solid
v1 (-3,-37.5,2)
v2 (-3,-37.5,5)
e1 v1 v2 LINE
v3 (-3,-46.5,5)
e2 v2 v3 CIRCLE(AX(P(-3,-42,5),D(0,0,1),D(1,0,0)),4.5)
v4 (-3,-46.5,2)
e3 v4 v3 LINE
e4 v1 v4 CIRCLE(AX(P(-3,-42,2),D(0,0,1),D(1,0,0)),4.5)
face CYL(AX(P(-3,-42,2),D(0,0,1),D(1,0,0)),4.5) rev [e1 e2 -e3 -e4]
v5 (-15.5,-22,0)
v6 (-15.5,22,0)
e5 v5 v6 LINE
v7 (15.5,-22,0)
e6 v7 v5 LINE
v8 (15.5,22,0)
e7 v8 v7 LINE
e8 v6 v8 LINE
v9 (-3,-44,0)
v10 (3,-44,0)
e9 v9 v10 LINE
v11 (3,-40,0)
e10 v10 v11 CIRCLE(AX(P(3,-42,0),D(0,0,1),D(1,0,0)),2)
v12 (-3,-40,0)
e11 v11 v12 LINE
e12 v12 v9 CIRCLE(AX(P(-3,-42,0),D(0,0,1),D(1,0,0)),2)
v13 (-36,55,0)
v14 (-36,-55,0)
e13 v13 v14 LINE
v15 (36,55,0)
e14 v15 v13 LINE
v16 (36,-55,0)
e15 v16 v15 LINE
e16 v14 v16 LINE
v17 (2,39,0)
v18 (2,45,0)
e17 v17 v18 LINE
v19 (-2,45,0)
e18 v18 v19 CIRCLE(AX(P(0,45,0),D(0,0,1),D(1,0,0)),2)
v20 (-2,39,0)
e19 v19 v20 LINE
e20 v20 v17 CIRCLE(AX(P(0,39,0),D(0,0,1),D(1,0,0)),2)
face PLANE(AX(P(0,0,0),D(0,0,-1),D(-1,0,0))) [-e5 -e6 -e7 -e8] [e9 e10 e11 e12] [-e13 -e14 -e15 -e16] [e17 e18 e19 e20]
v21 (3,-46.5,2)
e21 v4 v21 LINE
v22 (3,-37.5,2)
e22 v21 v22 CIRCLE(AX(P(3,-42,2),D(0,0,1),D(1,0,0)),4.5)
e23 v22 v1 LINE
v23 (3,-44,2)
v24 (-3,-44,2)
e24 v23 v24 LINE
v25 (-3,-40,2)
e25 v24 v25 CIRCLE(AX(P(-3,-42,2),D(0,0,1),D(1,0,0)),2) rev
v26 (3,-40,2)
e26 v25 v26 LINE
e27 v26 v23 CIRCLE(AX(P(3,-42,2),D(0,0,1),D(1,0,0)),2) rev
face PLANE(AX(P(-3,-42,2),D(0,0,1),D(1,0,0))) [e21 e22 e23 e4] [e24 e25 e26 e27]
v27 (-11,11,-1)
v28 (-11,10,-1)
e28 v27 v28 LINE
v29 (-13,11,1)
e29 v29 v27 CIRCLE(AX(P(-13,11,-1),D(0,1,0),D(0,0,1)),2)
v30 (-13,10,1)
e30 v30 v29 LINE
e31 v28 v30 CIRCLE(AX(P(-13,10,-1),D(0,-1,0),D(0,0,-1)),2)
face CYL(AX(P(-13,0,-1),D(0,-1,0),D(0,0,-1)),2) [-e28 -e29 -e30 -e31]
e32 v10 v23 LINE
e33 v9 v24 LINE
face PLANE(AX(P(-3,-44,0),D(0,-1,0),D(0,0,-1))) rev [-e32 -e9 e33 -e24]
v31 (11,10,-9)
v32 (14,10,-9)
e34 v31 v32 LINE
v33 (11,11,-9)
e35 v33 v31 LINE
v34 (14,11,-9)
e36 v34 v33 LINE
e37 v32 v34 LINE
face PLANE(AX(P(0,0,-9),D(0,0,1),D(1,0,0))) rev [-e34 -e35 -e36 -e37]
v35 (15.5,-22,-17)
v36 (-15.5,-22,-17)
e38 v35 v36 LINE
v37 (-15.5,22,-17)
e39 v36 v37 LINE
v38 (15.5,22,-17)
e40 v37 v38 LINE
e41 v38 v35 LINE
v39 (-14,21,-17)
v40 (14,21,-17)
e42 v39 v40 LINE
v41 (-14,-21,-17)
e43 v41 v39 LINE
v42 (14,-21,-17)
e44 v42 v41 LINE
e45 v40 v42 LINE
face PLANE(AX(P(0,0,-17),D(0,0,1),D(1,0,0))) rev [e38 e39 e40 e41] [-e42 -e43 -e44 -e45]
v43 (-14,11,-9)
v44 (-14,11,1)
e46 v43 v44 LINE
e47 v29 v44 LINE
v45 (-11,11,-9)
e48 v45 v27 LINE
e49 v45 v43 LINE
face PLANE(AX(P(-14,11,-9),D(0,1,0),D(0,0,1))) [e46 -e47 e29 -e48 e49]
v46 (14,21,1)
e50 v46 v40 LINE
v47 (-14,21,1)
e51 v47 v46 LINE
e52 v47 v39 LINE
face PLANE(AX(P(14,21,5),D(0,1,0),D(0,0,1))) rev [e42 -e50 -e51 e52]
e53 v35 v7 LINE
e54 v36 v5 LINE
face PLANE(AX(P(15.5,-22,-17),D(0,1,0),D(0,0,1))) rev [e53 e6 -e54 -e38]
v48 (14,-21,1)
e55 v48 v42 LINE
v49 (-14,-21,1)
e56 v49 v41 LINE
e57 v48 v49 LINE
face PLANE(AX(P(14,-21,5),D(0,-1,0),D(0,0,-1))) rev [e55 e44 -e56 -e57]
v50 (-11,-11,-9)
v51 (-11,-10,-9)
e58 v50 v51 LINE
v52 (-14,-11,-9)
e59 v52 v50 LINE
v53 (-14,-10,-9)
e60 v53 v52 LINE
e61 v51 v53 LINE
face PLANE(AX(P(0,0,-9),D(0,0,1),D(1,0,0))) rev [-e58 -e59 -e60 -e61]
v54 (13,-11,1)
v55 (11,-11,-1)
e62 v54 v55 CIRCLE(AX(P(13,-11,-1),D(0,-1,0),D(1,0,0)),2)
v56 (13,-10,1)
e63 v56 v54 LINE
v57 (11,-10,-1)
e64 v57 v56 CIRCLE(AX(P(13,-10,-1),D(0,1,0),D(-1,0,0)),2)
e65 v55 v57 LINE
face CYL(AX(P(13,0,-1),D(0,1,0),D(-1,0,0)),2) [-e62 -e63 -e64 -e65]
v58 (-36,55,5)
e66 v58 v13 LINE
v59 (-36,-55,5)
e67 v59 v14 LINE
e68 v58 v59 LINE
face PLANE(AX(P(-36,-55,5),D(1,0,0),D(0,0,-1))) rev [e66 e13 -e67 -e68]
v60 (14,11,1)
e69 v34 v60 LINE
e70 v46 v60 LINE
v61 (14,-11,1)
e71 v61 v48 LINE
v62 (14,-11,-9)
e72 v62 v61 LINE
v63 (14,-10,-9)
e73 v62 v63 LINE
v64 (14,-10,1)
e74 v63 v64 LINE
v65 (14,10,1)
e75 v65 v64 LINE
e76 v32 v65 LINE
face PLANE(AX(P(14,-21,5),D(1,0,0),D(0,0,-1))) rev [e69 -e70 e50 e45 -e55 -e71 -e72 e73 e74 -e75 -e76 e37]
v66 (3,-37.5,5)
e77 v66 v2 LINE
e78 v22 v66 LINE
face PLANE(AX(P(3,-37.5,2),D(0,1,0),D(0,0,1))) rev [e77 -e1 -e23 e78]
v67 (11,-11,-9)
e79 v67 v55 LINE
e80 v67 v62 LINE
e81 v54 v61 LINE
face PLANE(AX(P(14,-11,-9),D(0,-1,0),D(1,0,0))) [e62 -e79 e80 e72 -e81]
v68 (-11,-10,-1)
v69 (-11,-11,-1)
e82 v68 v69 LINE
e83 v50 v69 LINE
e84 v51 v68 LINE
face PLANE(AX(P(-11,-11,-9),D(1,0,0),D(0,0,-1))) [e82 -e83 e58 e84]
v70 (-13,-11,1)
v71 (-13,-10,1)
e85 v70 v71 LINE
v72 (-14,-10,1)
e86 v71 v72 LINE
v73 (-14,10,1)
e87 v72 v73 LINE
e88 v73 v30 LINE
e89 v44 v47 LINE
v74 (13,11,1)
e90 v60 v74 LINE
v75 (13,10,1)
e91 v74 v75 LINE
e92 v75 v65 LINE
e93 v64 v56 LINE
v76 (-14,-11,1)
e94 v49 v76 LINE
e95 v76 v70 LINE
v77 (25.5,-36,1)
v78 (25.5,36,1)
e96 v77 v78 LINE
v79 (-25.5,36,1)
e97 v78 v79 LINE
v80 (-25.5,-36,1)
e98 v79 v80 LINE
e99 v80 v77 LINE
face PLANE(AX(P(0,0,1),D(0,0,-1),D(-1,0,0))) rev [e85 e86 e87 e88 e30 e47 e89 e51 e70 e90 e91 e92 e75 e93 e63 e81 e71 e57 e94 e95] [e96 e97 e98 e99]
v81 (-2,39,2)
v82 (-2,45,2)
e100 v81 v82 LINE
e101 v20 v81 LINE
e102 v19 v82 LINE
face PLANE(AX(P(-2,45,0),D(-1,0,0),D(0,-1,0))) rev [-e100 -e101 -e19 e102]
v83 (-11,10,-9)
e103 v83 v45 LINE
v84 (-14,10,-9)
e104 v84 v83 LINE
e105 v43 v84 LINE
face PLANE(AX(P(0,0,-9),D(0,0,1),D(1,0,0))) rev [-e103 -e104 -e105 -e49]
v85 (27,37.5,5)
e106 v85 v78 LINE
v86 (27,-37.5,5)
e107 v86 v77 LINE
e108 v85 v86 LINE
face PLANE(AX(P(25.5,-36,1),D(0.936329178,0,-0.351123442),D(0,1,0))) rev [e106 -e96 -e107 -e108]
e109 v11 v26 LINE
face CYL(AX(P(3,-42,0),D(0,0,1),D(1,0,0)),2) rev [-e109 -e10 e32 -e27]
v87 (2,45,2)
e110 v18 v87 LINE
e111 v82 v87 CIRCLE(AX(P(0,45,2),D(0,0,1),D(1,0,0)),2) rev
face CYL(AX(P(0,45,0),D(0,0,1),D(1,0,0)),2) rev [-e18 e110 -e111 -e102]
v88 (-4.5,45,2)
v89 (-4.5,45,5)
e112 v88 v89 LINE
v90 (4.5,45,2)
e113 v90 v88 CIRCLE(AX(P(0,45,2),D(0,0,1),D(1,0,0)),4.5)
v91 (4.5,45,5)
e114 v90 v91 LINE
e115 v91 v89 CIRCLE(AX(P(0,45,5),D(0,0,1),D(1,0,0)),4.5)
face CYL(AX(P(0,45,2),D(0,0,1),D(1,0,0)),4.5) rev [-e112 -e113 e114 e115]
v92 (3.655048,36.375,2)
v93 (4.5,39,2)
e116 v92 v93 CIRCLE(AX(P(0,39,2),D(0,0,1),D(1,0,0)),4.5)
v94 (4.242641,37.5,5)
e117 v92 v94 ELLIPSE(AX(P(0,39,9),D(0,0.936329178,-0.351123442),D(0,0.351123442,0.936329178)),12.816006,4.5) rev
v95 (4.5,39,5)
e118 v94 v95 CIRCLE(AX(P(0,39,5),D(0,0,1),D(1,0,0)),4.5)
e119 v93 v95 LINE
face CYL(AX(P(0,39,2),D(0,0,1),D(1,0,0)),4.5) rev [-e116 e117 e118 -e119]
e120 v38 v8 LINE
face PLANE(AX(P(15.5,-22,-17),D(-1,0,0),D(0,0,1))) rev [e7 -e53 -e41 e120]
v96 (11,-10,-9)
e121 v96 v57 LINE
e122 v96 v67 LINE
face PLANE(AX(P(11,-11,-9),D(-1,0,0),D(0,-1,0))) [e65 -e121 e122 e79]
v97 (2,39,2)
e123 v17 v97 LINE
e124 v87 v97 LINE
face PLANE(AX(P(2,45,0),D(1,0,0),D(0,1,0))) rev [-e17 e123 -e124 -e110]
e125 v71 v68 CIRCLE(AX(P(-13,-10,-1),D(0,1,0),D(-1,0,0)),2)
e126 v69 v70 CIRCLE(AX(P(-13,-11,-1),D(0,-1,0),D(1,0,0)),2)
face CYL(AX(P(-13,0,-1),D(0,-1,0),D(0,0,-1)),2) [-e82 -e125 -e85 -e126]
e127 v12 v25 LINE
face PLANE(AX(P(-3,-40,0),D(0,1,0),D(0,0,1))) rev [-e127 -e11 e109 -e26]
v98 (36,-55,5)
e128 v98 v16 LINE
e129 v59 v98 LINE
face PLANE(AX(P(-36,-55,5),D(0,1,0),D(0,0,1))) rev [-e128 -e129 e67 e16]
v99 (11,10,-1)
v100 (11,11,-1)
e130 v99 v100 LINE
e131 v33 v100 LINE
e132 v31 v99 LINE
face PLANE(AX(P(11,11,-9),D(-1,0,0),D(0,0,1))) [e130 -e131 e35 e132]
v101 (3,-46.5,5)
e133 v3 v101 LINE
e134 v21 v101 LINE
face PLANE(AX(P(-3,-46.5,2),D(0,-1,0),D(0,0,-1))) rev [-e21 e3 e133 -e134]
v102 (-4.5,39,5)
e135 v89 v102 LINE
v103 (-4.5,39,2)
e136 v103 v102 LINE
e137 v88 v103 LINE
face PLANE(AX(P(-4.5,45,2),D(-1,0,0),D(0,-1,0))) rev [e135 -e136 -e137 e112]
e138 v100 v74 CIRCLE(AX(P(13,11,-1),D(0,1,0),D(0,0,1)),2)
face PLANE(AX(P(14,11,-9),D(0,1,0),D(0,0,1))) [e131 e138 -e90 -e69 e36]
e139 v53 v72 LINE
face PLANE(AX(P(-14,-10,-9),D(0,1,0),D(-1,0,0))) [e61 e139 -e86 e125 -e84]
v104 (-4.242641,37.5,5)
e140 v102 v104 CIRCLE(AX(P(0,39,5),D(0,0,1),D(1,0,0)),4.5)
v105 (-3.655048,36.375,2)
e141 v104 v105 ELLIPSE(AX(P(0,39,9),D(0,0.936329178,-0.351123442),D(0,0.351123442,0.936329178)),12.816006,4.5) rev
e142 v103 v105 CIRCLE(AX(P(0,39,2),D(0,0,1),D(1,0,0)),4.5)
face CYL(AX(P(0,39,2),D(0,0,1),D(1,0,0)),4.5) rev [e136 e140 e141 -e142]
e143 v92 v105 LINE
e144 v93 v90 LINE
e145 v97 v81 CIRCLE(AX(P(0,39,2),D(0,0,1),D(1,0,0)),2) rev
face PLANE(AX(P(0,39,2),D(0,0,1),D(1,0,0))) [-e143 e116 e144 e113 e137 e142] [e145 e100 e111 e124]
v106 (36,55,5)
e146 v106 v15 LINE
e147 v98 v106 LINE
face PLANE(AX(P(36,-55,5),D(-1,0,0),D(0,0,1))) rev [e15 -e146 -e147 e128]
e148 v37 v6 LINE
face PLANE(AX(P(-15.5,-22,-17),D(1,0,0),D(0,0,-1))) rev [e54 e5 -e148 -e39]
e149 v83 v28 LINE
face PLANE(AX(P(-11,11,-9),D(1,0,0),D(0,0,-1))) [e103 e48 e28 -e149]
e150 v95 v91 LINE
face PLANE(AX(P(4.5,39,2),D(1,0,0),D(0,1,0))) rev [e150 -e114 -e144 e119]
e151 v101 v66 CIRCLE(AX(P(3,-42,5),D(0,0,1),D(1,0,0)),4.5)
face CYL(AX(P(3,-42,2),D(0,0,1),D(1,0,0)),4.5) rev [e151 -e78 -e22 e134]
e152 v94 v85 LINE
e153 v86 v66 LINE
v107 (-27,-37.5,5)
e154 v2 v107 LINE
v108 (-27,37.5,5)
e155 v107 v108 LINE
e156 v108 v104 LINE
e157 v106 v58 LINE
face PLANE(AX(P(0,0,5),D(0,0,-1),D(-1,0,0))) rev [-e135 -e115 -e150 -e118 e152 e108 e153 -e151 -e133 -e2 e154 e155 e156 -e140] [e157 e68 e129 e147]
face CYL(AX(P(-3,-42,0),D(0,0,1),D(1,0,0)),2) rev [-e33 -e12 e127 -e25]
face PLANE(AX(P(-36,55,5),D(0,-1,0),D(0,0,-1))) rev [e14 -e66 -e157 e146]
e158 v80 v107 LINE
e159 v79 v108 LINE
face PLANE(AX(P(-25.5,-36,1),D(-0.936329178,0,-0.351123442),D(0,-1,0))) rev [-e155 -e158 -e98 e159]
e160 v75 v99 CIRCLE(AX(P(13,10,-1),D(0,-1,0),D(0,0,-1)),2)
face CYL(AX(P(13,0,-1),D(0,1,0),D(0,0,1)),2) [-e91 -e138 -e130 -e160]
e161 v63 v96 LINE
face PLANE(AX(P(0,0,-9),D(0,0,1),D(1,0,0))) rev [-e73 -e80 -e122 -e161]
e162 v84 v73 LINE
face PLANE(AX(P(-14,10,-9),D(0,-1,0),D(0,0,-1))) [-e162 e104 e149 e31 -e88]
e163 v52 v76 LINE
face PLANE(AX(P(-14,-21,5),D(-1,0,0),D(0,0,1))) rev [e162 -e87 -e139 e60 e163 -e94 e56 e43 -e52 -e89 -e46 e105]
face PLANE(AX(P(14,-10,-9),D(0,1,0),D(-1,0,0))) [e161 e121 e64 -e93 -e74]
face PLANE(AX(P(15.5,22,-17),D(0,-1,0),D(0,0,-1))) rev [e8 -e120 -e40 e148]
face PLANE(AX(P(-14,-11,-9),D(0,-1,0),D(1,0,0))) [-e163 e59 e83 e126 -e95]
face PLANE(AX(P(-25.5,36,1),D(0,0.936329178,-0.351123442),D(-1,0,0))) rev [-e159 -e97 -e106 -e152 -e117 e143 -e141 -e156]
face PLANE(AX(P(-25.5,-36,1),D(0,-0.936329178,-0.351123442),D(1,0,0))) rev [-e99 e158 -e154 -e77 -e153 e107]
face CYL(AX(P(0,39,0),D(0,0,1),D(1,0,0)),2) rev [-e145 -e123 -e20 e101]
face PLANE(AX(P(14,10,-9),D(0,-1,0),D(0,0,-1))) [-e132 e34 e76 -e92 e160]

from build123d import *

# Parameters (mm, degrees)
ESBO_O1_W                = 72
ESBO_O1_H                = 110
RESSALTO_EXTRUS_O1_DEPTH = 5
ESBO_O2_W                = 51
ESBO_O2_H                = 72
CORTE_EXTRUS_O1_DEPTH    = 4
CHANFRO1_SIZE            = 1.5
CHANFRO1_SIZE_2          = 4
CORTE_EXTRUS_O2_DEPTH    = 66.924198895
CORTE_EXTRUS_O3_DEPTH    = 66.924198895
CORTE_EXTRUS_O4_DEPTH    = 3
CORTE_EXTRUS_O5_DEPTH    = 3
ESBO_O7_W                = 31
ESBO_O7_H                = 44
RESSALTO_EXTRUS_O2_DEPTH = 17
ESBO_O8_W                = 28
ESBO_O8_H                = 42
CORTE_EXTRUS_O6_DEPTH    = 70.318107302
ESBO_O9_W                = 3
ESBO_O9_H                = 1
RESSALTO_EXTRUS_O3_DEPTH = 10
FILETE1_R                = 2


with BuildPart() as part:
    # Esboço1 → Ressalto-extrusão1 (new body)
    with BuildSketch(Plane.XY):
        Rectangle(ESBO_O1_W, ESBO_O1_H)
    extrude(amount=RESSALTO_EXTRUS_O1_DEPTH)

    # Esboço2 → Corte-extrusão1 (cut)
    with BuildSketch(Plane.XY.offset(5)):
        Rectangle(ESBO_O2_W, ESBO_O2_H)
    extrude(amount=-CORTE_EXTRUS_O1_DEPTH, mode=Mode.SUBTRACT)

    # Chanfro1
    # the kernel refuses this chamfer: 4, 1.5 mm, written as the material it takes off along each edge
    with BuildSketch(Plane(origin=(-25.5, -36, 5), x_dir=(0, -0.9953980532473654, 0.09582648689874358), z_dir=(1, 0, 0))) as chanfro1_piece_1_section:
        Polygon((CHANFRO1_SIZE * 0.995398053247, CHANFRO1_SIZE * 0.0958264868987), (-CHANFRO1_SIZE_2 * 0.0958264868987, CHANFRO1_SIZE_2 * 0.995398053247), (0, 0), align=None)
    chanfro1_piece_1 = extrude(amount=51, mode=Mode.PRIVATE)
    chanfro1_piece_1 = split(chanfro1_piece_1, bisect_by=Plane(origin=(0, -36.465264147, 1), z_dir=(0, 0, 1)), keep=Keep.TOP, mode=Mode.PRIVATE)
    add(chanfro1_piece_1, mode=Mode.SUBTRACT)
    with BuildSketch(Plane(origin=(-25.5, 36, 5), x_dir=(-0.9953980532473654, 0, 0.09582648689874379), z_dir=(0, -1, 0))) as chanfro1_piece_2_section:
        Polygon((CHANFRO1_SIZE * 0.995398053247, CHANFRO1_SIZE * 0.0958264868987), (-CHANFRO1_SIZE_2 * 0.0958264868987, CHANFRO1_SIZE_2 * 0.995398053247), (0, 0), align=None)
    chanfro1_piece_2 = extrude(amount=72, mode=Mode.PRIVATE)
    chanfro1_piece_2 = split(chanfro1_piece_2, bisect_by=Plane(origin=(-25.965264147, 0, 1), z_dir=(0, 0, 1)), keep=Keep.TOP, mode=Mode.PRIVATE)
    add(chanfro1_piece_2, mode=Mode.SUBTRACT)
    with BuildSketch(Plane(origin=(25.5, -36, 5), x_dir=(0.9953980532473654, 0, 0.09582648689874379), z_dir=(0, 1, 0))) as chanfro1_piece_3_section:
        Polygon((CHANFRO1_SIZE * 0.995398053247, CHANFRO1_SIZE * 0.0958264868987), (-CHANFRO1_SIZE_2 * 0.0958264868987, CHANFRO1_SIZE_2 * 0.995398053247), (0, 0), align=None)
    chanfro1_piece_3 = extrude(amount=72, mode=Mode.PRIVATE)
    chanfro1_piece_3 = split(chanfro1_piece_3, bisect_by=Plane(origin=(25.965264147, 0, 1), z_dir=(0, 0, 1)), keep=Keep.TOP, mode=Mode.PRIVATE)
    add(chanfro1_piece_3, mode=Mode.SUBTRACT)
    with BuildSketch(Plane(origin=(25.5, 36, 5), x_dir=(0, 0.9953980532473654, 0.09582648689874358), z_dir=(-1, 0, 0))) as chanfro1_piece_4_section:
        Polygon((CHANFRO1_SIZE * 0.995398053247, CHANFRO1_SIZE * 0.0958264868987), (-CHANFRO1_SIZE_2 * 0.0958264868987, CHANFRO1_SIZE_2 * 0.995398053247), (0, 0), align=None)
    chanfro1_piece_4 = extrude(amount=51, mode=Mode.PRIVATE)
    chanfro1_piece_4 = split(chanfro1_piece_4, bisect_by=Plane(origin=(0, 36.465264147, 1), z_dir=(0, 0, 1)), keep=Keep.TOP, mode=Mode.PRIVATE)
    add(chanfro1_piece_4, mode=Mode.SUBTRACT)
    with BuildSketch(Plane(origin=(-35.875482322, -36, 5), x_dir=(0, -0.9953980532473654, 0.09582648689874358), z_dir=(1, 0, 0))) as chanfro1_piece_5a_section:
        Polygon((CHANFRO1_SIZE * 0.995398053247, CHANFRO1_SIZE * 0.0958264868987), (-CHANFRO1_SIZE_2 * 0.0958264868987, CHANFRO1_SIZE_2 * 0.995398053247), (0, 0), align=None)
    chanfro1_piece_5a = extrude(amount=61.375482322, mode=Mode.PRIVATE)
    chanfro1_piece_5a = split(chanfro1_piece_5a, bisect_by=Plane(origin=(-25.5, -36.465264147, 3.645492171), z_dir=(-1, 0, 0)), keep=Keep.TOP, mode=Mode.PRIVATE)
    chanfro1_piece_5a = split(chanfro1_piece_5a, bisect_by=Plane(origin=(-30.687741161, -36.465264147, 1), z_dir=(0, 0, 1)), keep=Keep.TOP, mode=Mode.PRIVATE)
    with BuildSketch(Plane(origin=(-25.5, 36, 5), x_dir=(-0.9953980532473654, 0, 0.09582648689874379), z_dir=(0, -1, 0))) as chanfro1_piece_5b_section:
        Polygon((CHANFRO1_SIZE * 0.995398053247, CHANFRO1_SIZE * 0.0958264868987), (-CHANFRO1_SIZE_2 * 0.0958264868987, CHANFRO1_SIZE_2 * 0.995398053247), (0, 0), align=None)
    chanfro1_piece_5b = extrude(amount=82.375482322, mode=Mode.PRIVATE)
    chanfro1_piece_5b = split(chanfro1_piece_5b, bisect_by=Plane(origin=(-25.965264147, -36, 3.645492171), z_dir=(0, -1, 0)), keep=Keep.TOP, mode=Mode.PRIVATE)
    chanfro1_piece_5b = split(chanfro1_piece_5b, bisect_by=Plane(origin=(-25.965264147, -41.187741161, 1), z_dir=(0, 0, 1)), keep=Keep.TOP, mode=Mode.PRIVATE)
    chanfro1_piece_5 = chanfro1_piece_5a & chanfro1_piece_5b
    add(chanfro1_piece_5, mode=Mode.SUBTRACT)
    with BuildSketch(Plane(origin=(-25.5, -36, 5), x_dir=(0, -0.9953980532473654, 0.09582648689874358), z_dir=(1, 0, 0))) as chanfro1_piece_6a_section:
        Polygon((CHANFRO1_SIZE * 0.995398053247, CHANFRO1_SIZE * 0.0958264868987), (-CHANFRO1_SIZE_2 * 0.0958264868987, CHANFRO1_SIZE_2 * 0.995398053247), (0, 0), align=None)
    chanfro1_piece_6a = extrude(amount=61.375482322, mode=Mode.PRIVATE)
    chanfro1_piece_6a = split(chanfro1_piece_6a, bisect_by=Plane(origin=(25.5, -36.465264147, 3.645492171), z_dir=(1, 0, 0)), keep=Keep.TOP, mode=Mode.PRIVATE)
    chanfro1_piece_6a = split(chanfro1_piece_6a, bisect_by=Plane(origin=(30.687741161, -36.465264147, 1), z_dir=(0, 0, 1)), keep=Keep.TOP, mode=Mode.PRIVATE)
    with BuildSketch(Plane(origin=(25.5, -46.375482322, 5), x_dir=(0.9953980532473654, 0, 0.09582648689874379), z_dir=(0, 1, 0))) as chanfro1_piece_6b_section:
        Polygon((CHANFRO1_SIZE * 0.995398053247, CHANFRO1_SIZE * 0.0958264868987), (-CHANFRO1_SIZE_2 * 0.0958264868987, CHANFRO1_SIZE_2 * 0.995398053247), (0, 0), align=None)
    chanfro1_piece_6b = extrude(amount=82.375482322, mode=Mode.PRIVATE)
    chanfro1_piece_6b = split(chanfro1_piece_6b, bisect_by=Plane(origin=(25.965264147, -36, 3.645492171), z_dir=(0, -1, 0)), keep=Keep.TOP, mode=Mode.PRIVATE)
    chanfro1_piece_6b = split(chanfro1_piece_6b, bisect_by=Plane(origin=(25.965264147, -41.187741161, 1), z_dir=(0, 0, 1)), keep=Keep.TOP, mode=Mode.PRIVATE)
    chanfro1_piece_6 = chanfro1_piece_6a & chanfro1_piece_6b
    add(chanfro1_piece_6, mode=Mode.SUBTRACT)
    with BuildSketch(Plane(origin=(25.5, 36, 5), x_dir=(0, 0.9953980532473654, 0.09582648689874358), z_dir=(-1, 0, 0))) as chanfro1_piece_7a_section:
        Polygon((CHANFRO1_SIZE * 0.995398053247, CHANFRO1_SIZE * 0.0958264868987), (-CHANFRO1_SIZE_2 * 0.0958264868987, CHANFRO1_SIZE_2 * 0.995398053247), (0, 0), align=None)
    chanfro1_piece_7a = extrude(amount=61.375482322, mode=Mode.PRIVATE)
    chanfro1_piece_7a = split(chanfro1_piece_7a, bisect_by=Plane(origin=(-25.5, 36.465264147, 3.645492171), z_dir=(-1, 0, 0)), keep=Keep.TOP, mode=Mode.PRIVATE)
    chanfro1_piece_7a = split(chanfro1_piece_7a, bisect_by=Plane(origin=(-30.687741161, 36.465264147, 1), z_dir=(0, 0, 1)), keep=Keep.TOP, mode=Mode.PRIVATE)
    with BuildSketch(Plane(origin=(-25.5, 46.375482322, 5), x_dir=(-0.9953980532473654, 0, 0.09582648689874379), z_dir=(0, -1, 0))) as chanfro1_piece_7b_section:
        Polygon((CHANFRO1_SIZE * 0.995398053247, CHANFRO1_SIZE * 0.0958264868987), (-CHANFRO1_SIZE_2 * 0.0958264868987, CHANFRO1_SIZE_2 * 0.995398053247), (0, 0), align=None)
    chanfro1_piece_7b = extrude(amount=82.375482322, mode=Mode.PRIVATE)
    chanfro1_piece_7b = split(chanfro1_piece_7b, bisect_by=Plane(origin=(-25.965264147, 36, 3.645492171), z_dir=(0, 1, 0)), keep=Keep.TOP, mode=Mode.PRIVATE)
    chanfro1_piece_7b = split(chanfro1_piece_7b, bisect_by=Plane(origin=(-25.965264147, 41.187741161, 1), z_dir=(0, 0, 1)), keep=Keep.TOP, mode=Mode.PRIVATE)
    chanfro1_piece_7 = chanfro1_piece_7a & chanfro1_piece_7b
    add(chanfro1_piece_7, mode=Mode.SUBTRACT)
    with BuildSketch(Plane(origin=(25.5, -36, 5), x_dir=(0.9953980532473654, 0, 0.09582648689874379), z_dir=(0, 1, 0))) as chanfro1_piece_8a_section:
        Polygon((CHANFRO1_SIZE * 0.995398053247, CHANFRO1_SIZE * 0.0958264868987), (-CHANFRO1_SIZE_2 * 0.0958264868987, CHANFRO1_SIZE_2 * 0.995398053247), (0, 0), align=None)
    chanfro1_piece_8a = extrude(amount=82.375482322, mode=Mode.PRIVATE)
    chanfro1_piece_8a = split(chanfro1_piece_8a, bisect_by=Plane(origin=(25.965264147, 36, 3.645492171), z_dir=(0, 1, 0)), keep=Keep.TOP, mode=Mode.PRIVATE)
    chanfro1_piece_8a = split(chanfro1_piece_8a, bisect_by=Plane(origin=(25.965264147, 41.187741161, 1), z_dir=(0, 0, 1)), keep=Keep.TOP, mode=Mode.PRIVATE)
    with BuildSketch(Plane(origin=(35.875482322, 36, 5), x_dir=(0, 0.9953980532473654, 0.09582648689874358), z_dir=(-1, 0, 0))) as chanfro1_piece_8b_section:
        Polygon((CHANFRO1_SIZE * 0.995398053247, CHANFRO1_SIZE * 0.0958264868987), (-CHANFRO1_SIZE_2 * 0.0958264868987, CHANFRO1_SIZE_2 * 0.995398053247), (0, 0), align=None)
    chanfro1_piece_8b = extrude(amount=61.375482322, mode=Mode.PRIVATE)
    chanfro1_piece_8b = split(chanfro1_piece_8b, bisect_by=Plane(origin=(25.5, 36.465264147, 3.645492171), z_dir=(1, 0, 0)), keep=Keep.TOP, mode=Mode.PRIVATE)
    chanfro1_piece_8b = split(chanfro1_piece_8b, bisect_by=Plane(origin=(30.687741161, 36.465264147, 1), z_dir=(0, 0, 1)), keep=Keep.TOP, mode=Mode.PRIVATE)
    chanfro1_piece_8 = chanfro1_piece_8a & chanfro1_piece_8b
    add(chanfro1_piece_8, mode=Mode.SUBTRACT)

    # Esboço3 → Corte-extrusão2 (cut, through all)
    with BuildSketch(Plane.XY.offset(5)):
        with BuildLine():
            Line((-2, 45), (-2, 39))
            ThreePointArc((-2, 39), (0, 37), (2, 39))
            Line((2, 39), (2, 45))
            ThreePointArc((2, 45), (0, 47), (-2, 45))
        make_face()
    extrude(amount=-CORTE_EXTRUS_O2_DEPTH, mode=Mode.SUBTRACT)

    # Esboço4 → Corte-extrusão3 (cut, through all)
    with BuildSketch(Plane.XY.offset(5)):
        with BuildLine():
            Line((-3, -40), (3, -40))
            ThreePointArc((3, -40), (5, -42), (3, -44))
            Line((3, -44), (-3, -44))
            ThreePointArc((-3, -44), (-5, -42), (-3, -40))
        make_face()
    extrude(amount=-CORTE_EXTRUS_O3_DEPTH, mode=Mode.SUBTRACT)

    # Esboço5 → Corte-extrusão4 (cut)
    with BuildSketch(Plane.XY.offset(5)):
        with BuildLine():
            Line((4.5, 39), (4.5, 45))
            ThreePointArc((4.5, 45), (0, 49.5), (-4.5, 45))
            Line((-4.5, 45), (-4.5, 39))
            ThreePointArc((-4.5, 39), (-4.101470225, 37.148529775), (-2.976470225, 35.625))
            ThreePointArc((-2.976470225, 35.625), (0, 34.5), (2.976470225, 35.625))
            ThreePointArc((2.976470225, 35.625), (4.101470225, 37.148529775), (4.5, 39))
        make_face()
    extrude(amount=-CORTE_EXTRUS_O4_DEPTH, mode=Mode.SUBTRACT)

    # Esboço6 → Corte-extrusão5 (cut)
    with BuildSketch(Plane.XY.offset(5)):
        with BuildLine():
            Line((-3, -46.5), (3, -46.5))
            ThreePointArc((3, -46.5), (7.5, -42), (3, -37.5))
            Line((3, -37.5), (-3, -37.5))
            ThreePointArc((-3, -37.5), (-7.5, -42), (-3, -46.5))
        make_face()
    extrude(amount=-CORTE_EXTRUS_O5_DEPTH, mode=Mode.SUBTRACT)

    # Esboço7 → Ressalto-extrusão2 (add)
    with BuildSketch(Plane(origin=(0, 0, 0), x_dir=(-1, 0, 0), z_dir=(0, 0, -1))):
        Rectangle(ESBO_O7_W, ESBO_O7_H)
    extrude(amount=RESSALTO_EXTRUS_O2_DEPTH)

    # Esboço8 → Corte-extrusão6 (cut, through all)
    with BuildSketch(Plane(origin=(0, 0, -17), x_dir=(-1, 0, 0), z_dir=(0, 0, -1))):
        Rectangle(ESBO_O8_W, ESBO_O8_H)
    extrude(amount=-CORTE_EXTRUS_O6_DEPTH, mode=Mode.SUBTRACT)

    # Esboço9 → Ressalto-extrusão3 (add)
    with BuildSketch(Plane.XY.offset(1)):
        with Locations((-12.5, 10.5)):
            Rectangle(ESBO_O9_W, ESBO_O9_H)
        with Locations((12.5, 10.5)):
            Rectangle(ESBO_O9_W, ESBO_O9_H)
        with Locations((12.5, -10.5)):
            Rectangle(ESBO_O9_W, ESBO_O9_H)
        with Locations((-12.5, -10.5)):
            Rectangle(ESBO_O9_W, ESBO_O9_H)
    extrude(amount=-RESSALTO_EXTRUS_O3_DEPTH)

    # Filete1
    filete1_edges = [part.edges().sort_by_distance(p)[0] for p in [
        (-11, 10.5, 1),
        (11, 10.5, 1),
        (11, -10.5, 1),
        (-11, -10.5, 1),
    ]]
    fillet(filete1_edges, radius=FILETE1_R)


solid = part.part
